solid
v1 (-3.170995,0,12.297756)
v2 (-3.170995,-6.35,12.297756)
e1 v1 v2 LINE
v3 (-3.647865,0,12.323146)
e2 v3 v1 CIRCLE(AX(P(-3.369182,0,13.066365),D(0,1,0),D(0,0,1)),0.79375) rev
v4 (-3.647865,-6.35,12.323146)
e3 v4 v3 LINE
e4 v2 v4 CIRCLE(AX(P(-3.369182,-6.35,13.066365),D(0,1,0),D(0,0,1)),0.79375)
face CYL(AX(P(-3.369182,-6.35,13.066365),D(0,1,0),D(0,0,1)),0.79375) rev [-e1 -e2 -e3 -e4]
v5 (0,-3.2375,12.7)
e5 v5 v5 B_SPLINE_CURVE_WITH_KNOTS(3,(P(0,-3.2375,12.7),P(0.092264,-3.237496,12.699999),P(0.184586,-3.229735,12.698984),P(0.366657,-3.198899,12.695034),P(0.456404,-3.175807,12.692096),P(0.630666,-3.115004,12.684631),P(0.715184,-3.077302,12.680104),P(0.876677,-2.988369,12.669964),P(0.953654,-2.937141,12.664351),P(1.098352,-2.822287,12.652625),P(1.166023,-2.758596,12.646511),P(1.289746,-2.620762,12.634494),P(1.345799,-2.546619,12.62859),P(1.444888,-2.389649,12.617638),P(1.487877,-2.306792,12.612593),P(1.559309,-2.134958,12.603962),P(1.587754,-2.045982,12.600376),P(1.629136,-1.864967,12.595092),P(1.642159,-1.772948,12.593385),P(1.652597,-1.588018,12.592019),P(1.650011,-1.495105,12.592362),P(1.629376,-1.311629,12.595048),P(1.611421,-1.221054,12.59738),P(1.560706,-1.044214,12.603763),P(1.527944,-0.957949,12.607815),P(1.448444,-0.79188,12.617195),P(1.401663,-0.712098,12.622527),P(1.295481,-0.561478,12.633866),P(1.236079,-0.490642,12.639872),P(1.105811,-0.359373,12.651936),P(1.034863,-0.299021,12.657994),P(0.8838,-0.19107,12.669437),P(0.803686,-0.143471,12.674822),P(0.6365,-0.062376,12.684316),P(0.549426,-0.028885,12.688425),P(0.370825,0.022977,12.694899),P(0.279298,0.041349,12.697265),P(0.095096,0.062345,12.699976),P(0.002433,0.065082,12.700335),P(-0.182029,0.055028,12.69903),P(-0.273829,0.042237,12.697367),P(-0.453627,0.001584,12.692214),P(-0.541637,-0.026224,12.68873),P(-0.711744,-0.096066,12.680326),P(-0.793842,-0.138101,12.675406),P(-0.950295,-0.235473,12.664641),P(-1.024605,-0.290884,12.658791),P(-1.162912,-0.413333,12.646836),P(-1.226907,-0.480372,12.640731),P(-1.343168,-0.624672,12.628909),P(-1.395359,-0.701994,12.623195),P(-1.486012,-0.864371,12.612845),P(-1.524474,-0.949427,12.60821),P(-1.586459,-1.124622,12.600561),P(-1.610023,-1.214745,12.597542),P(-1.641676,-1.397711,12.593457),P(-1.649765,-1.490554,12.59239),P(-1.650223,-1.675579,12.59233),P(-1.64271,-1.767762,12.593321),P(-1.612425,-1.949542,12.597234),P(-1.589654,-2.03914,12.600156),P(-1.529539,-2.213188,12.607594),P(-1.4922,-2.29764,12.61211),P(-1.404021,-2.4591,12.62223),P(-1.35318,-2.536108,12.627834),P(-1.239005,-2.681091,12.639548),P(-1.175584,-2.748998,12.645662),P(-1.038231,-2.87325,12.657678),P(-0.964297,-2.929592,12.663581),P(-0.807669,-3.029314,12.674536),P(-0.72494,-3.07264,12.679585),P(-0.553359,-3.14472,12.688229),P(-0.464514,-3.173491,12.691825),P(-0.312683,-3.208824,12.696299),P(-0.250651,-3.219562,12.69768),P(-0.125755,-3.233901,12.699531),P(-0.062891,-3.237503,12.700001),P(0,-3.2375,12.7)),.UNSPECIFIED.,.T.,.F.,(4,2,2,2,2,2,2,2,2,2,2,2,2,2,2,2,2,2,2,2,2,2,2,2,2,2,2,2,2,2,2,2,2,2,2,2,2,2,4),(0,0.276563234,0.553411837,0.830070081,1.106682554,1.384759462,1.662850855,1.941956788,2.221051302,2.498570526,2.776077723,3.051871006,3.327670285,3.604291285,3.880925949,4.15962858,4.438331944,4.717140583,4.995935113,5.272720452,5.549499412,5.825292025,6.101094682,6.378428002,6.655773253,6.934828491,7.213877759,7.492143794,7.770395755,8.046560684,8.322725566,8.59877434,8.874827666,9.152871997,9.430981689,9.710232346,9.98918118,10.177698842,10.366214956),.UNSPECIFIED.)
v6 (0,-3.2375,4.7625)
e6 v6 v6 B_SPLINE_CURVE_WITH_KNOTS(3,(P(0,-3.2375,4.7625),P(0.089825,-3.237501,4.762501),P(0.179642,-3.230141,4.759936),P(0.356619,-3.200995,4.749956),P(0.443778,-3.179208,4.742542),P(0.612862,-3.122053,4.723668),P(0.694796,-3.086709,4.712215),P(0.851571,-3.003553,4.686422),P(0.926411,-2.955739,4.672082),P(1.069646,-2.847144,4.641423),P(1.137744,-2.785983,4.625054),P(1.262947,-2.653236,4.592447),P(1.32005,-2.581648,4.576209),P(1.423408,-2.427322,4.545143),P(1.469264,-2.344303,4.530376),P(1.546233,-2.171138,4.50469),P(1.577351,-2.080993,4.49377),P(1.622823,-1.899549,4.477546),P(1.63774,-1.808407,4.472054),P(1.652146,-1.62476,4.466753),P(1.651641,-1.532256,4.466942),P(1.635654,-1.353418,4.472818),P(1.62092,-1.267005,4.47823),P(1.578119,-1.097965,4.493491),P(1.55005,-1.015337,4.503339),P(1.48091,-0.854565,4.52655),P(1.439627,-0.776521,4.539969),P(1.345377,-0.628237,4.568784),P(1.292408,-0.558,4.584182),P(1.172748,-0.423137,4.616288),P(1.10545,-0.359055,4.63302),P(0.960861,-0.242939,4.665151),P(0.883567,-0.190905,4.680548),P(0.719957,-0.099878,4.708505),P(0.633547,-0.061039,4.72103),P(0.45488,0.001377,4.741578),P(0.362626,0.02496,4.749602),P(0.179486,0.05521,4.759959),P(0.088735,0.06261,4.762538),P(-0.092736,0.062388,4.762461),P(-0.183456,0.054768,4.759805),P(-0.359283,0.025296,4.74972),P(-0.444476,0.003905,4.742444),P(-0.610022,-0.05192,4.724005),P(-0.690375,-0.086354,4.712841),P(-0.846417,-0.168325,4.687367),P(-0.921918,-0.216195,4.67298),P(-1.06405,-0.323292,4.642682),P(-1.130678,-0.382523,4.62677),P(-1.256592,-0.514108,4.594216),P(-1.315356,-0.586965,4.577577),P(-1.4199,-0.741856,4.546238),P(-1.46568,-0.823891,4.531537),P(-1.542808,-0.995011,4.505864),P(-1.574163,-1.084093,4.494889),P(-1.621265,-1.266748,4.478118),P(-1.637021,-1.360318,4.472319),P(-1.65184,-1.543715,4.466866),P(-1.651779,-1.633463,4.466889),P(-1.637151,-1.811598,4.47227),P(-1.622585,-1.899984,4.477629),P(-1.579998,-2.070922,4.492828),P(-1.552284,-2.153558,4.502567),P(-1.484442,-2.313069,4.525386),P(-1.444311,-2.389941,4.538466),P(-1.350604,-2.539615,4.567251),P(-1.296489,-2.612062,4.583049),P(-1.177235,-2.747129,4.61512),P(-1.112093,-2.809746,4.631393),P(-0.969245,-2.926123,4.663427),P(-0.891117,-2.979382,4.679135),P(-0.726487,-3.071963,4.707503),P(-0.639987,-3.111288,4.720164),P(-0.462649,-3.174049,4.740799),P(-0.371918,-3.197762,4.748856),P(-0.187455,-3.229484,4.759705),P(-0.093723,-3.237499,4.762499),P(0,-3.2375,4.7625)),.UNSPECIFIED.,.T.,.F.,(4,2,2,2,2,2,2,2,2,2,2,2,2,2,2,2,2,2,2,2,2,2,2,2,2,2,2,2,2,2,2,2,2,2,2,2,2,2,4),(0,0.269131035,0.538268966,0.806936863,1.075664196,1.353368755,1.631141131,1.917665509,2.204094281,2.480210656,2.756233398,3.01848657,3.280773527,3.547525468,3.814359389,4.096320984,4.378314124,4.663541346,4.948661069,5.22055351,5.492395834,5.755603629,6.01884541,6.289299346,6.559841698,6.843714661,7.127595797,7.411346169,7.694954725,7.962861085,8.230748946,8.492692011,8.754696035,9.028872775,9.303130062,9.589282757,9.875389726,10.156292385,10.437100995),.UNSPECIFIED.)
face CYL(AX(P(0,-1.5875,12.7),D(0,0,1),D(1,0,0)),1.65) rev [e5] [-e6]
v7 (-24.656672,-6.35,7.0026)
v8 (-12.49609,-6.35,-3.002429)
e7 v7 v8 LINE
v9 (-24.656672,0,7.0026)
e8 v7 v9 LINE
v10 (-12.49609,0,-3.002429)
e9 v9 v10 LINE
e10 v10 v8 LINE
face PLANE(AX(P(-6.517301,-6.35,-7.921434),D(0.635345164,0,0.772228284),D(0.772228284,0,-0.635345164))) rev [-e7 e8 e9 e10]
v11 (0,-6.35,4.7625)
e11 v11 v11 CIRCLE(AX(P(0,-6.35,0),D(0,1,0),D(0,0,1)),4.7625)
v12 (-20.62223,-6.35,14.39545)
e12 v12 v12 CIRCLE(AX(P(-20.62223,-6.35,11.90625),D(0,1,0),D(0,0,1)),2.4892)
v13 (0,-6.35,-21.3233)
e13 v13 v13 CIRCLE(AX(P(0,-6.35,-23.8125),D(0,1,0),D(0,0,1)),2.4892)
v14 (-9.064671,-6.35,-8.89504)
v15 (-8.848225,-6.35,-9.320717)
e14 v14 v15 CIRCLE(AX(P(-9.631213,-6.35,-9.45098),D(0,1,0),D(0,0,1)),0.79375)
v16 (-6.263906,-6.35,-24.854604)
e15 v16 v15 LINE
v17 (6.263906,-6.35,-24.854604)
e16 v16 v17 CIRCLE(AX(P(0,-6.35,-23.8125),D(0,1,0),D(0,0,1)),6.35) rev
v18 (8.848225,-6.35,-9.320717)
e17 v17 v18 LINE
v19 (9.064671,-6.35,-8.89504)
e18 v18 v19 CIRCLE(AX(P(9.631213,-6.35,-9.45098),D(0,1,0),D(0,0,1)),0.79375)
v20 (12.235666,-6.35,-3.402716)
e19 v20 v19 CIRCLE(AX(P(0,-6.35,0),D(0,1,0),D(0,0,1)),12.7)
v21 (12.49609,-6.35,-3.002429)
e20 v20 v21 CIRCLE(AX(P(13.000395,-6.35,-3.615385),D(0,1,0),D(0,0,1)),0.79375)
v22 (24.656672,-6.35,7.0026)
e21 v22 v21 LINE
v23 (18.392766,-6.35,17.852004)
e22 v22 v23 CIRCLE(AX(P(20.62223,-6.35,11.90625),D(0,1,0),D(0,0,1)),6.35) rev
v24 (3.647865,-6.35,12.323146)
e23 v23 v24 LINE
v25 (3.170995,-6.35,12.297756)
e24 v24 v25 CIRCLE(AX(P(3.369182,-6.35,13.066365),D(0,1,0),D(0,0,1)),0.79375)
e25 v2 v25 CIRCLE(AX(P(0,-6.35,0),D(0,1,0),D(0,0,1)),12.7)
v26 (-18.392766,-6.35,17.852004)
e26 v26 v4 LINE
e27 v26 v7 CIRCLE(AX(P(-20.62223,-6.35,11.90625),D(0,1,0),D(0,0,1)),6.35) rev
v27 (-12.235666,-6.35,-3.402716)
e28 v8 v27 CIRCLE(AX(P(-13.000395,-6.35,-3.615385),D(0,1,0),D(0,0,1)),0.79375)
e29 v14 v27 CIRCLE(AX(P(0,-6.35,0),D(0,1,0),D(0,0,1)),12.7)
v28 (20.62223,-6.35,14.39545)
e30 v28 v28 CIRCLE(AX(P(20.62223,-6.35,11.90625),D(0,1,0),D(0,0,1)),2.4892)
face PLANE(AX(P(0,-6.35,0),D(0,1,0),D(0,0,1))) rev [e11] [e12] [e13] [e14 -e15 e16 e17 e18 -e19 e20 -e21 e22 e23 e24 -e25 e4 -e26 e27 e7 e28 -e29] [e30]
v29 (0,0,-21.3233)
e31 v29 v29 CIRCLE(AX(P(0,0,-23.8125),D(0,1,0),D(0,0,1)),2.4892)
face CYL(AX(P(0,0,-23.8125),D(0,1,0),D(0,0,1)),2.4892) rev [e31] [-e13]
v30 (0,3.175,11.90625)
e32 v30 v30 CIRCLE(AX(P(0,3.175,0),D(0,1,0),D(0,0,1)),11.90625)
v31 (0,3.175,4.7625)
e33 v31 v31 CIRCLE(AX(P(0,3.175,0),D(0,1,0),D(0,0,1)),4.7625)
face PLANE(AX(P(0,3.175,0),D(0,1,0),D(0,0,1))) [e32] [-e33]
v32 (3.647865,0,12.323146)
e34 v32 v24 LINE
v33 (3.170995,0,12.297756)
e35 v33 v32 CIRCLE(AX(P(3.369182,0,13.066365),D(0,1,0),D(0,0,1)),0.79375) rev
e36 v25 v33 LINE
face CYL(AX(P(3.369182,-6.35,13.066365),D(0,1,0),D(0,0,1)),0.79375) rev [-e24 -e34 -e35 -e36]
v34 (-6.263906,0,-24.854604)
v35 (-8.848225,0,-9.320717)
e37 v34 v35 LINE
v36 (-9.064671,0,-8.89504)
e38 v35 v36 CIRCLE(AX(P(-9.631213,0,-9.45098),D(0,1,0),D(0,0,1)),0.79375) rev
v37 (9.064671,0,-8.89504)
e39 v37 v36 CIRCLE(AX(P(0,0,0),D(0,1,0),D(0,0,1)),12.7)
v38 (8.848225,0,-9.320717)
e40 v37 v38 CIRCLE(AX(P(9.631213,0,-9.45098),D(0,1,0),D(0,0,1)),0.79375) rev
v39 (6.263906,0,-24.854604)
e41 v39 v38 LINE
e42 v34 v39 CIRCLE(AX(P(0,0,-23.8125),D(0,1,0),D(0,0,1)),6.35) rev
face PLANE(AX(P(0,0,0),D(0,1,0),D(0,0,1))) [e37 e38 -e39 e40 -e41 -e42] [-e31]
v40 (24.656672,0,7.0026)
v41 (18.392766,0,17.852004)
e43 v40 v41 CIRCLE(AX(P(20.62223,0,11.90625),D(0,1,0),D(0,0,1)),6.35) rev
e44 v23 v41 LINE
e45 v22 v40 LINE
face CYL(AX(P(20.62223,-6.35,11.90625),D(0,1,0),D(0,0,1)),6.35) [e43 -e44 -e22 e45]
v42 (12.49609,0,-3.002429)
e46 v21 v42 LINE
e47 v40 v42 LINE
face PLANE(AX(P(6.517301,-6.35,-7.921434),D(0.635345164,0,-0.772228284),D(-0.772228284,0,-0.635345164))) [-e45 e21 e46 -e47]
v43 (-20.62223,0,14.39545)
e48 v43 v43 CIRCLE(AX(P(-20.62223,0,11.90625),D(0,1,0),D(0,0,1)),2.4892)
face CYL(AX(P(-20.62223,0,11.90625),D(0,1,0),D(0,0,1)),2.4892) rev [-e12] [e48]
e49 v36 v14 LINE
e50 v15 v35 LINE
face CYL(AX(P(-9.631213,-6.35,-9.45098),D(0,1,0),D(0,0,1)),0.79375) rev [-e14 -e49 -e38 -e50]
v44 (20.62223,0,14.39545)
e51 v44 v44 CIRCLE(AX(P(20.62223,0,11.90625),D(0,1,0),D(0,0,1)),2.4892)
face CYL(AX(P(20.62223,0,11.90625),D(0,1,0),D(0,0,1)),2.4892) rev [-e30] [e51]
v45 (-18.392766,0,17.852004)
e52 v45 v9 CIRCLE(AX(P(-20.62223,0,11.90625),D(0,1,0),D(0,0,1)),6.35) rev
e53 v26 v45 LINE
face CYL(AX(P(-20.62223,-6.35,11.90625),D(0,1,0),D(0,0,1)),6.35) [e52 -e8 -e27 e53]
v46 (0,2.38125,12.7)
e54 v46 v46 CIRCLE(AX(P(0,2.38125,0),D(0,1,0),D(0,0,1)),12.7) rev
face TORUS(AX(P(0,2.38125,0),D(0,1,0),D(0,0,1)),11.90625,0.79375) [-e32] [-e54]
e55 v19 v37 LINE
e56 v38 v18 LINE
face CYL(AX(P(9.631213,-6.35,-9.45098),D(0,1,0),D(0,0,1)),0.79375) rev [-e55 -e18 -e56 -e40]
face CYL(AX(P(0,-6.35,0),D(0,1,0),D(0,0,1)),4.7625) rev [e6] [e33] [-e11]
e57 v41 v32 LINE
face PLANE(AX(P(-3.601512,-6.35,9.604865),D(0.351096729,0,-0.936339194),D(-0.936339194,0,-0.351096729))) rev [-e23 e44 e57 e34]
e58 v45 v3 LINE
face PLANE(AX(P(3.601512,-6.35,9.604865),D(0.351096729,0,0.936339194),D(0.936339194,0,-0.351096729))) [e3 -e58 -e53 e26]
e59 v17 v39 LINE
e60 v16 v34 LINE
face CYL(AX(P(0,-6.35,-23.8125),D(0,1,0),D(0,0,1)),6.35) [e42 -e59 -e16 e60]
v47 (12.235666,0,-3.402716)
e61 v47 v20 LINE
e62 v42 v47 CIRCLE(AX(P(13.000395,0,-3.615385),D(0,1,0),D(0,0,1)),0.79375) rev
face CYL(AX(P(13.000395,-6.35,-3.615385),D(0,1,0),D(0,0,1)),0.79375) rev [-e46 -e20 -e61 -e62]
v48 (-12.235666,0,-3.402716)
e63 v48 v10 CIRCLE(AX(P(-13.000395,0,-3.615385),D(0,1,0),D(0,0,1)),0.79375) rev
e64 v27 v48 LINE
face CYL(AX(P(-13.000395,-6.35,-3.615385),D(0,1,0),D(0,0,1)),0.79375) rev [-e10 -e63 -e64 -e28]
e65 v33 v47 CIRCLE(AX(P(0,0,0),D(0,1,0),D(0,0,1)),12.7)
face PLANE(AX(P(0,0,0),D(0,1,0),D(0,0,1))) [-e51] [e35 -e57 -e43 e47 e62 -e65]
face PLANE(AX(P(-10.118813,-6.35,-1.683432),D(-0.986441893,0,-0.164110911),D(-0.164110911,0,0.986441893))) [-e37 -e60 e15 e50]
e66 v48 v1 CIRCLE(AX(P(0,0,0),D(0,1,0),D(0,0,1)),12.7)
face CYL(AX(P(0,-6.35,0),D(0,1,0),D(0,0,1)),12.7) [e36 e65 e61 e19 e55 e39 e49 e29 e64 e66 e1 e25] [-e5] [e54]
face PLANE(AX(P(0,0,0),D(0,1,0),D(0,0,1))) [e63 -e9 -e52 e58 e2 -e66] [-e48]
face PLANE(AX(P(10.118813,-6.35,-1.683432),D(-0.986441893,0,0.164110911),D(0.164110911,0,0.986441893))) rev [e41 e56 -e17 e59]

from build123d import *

# Parameters (mm, degrees)
SKETCH1_R                        = 12.7
SKETCH1_R_2                      = 4.7625
BOSS_EXTRUDE1_DEPTH              = 6.35
BOSS_EXTRUDE2_START              = 3.175
SKETCH1_5_R                      = 12.7
SKETCH1_5_R_2                    = 4.7625
BOSS_EXTRUDE2_DEPTH              = 3.175
F_10_CLEARANCE_HOLE1_D           = 4.9784
TAP_DRILL_FOR_M4X0_7_TAP1_REACH  = 52.866
TAP_DRILL_FOR_M4X0_7_TAP1_BORE_R = 1.65
FILLET1_R                        = 0.79375


with BuildPart() as part:
    # Sketch1 → Boss-Extrude1 (new body)
    # profile 1 of 4: a face of its own
    with BuildSketch(Plane(origin=(0, 0, 0), x_dir=(1, 0, 0), z_dir=(0, 1, 0))):
        with BuildLine():
            ThreePointArc((6.263906023, 24.854604283), (0, 30.1625), (-6.263906023, 24.854604283))
            Line((-6.263906023, 24.854604283), (-8.89, 9.069614104))
            ThreePointArc((-8.89, 9.069614104), (0, 12.7), (8.89, 9.069614104))
            Line((8.89, 9.069614104), (6.263906023, 24.854604283))
        make_face()
    # profile 2 of 4: a face of its own
    with BuildSketch(Plane(origin=(0, 0, 0), x_dir=(1, 0, 0), z_dir=(0, 1, 0))):
        Circle(SKETCH1_R)
        with Locations(Location((0, 0, 0), (0, 0, 270))):
            Circle(SKETCH1_R_2, mode=Mode.SUBTRACT)
    # profile 3 of 4: a face of its own
    with BuildSketch(Plane(origin=(0, 0, 0), x_dir=(1, 0, 0), z_dir=(0, 1, 0))):
        with BuildLine():
            Line((24.656671722, -7.002600399), (12.299516217, 3.164158788))
            ThreePointArc((12.299516217, 3.164158788), (12.599481258, 1.594701233), (12.7, 0))
            ThreePointArc((12.7, 0), (10.114120228, -7.680792409), (3.409516217, -12.233772892))
            Line((3.409516217, -12.233772892), (18.392765699, -17.852003884))
            ThreePointArc((18.392765699, -17.852003884), (26.121491242, -15.08125), (24.656671722, -7.002600399))
        make_face()
    # profile 4 of 4: a face of its own
    with BuildSketch(Plane(origin=(0, 0, 0), x_dir=(1, 0, 0), z_dir=(0, 1, 0))):
        with BuildLine():
            ThreePointArc((-3.409516217, -12.233772892), (-10.998522628, -6.35), (-12.299516217, 3.164158788))
            Line((-12.299516217, 3.164158788), (-24.656671722, -7.002600399))
            ThreePointArc((-24.656671722, -7.002600399), (-26.121491242, -15.08125), (-18.392765699, -17.852003884))
            Line((-18.392765699, -17.852003884), (-3.409516217, -12.233772892))
        make_face()
    extrude(amount=-BOSS_EXTRUDE1_DEPTH)

    # Sketch1<5> → Boss-Extrude2 (add)
    with BuildSketch(Plane(origin=(0, 0, 0), x_dir=(1, 0, 0), z_dir=(0, 1, 0)).offset(BOSS_EXTRUDE2_START)):
        with Locations(Location((0, 0, 0), (0, 0, 270))):
            Circle(SKETCH1_5_R)
        with Locations(Location((0, 0, 0), (0, 0, 270))):
            Circle(SKETCH1_5_R_2, mode=Mode.SUBTRACT)
    extrude(amount=-BOSS_EXTRUDE2_DEPTH)

    # #10 Clearance Hole1 (through all)
    with Locations(Plane(origin=(0, 0, -23.8125), x_dir=(0, 0, 1), z_dir=(0, 1, 0))):
        with Locations((0, 0), (35.71875, 20.622229928), (35.71875, -20.622229928)):
            Hole(F_10_CLEARANCE_HOLE1_D / 2)

    # Tap Drill for M4x0.7 Tap1 bore (on position points) → Tap Drill for M4x0.7 Tap1 (cut, up to next)
    with BuildSketch(Plane(origin=(0, -1.5875, 12.7), x_dir=(1, 0, 0), z_dir=(0, 0, 1)), mode=Mode.PRIVATE) as tap_drill_for_m4x0_7_tap1_sk1:
        Circle(TAP_DRILL_FOR_M4X0_7_TAP1_BORE_R)
    tap_drill_for_m4x0_7_tap1_tool1 = extrude(tap_drill_for_m4x0_7_tap1_sk1.sketch, amount=-TAP_DRILL_FOR_M4X0_7_TAP1_REACH, mode=Mode.PRIVATE) & part.part
    add(tap_drill_for_m4x0_7_tap1_tool1.solids().sort_by_distance((0, -1.5875, 12.7))[0], mode=Mode.SUBTRACT)

    # Fillet1
    # the kernel refuses this fillet: 0.79375 mm, written as the material it adds along each edge
    with BuildSketch(Plane(origin=(8.89, 0, -9.069614104), x_dir=(0.7073032764952122, 0, 0.7069102312593428), z_dir=(0, -1, 0)), Plane(origin=(3.409516217, 0, 12.233772892), x_dir=(-0.9658538567133282, 0, 0.2590874899951552), z_dir=(0, -1, 0)), Plane(origin=(-12.299516217, 0, -3.164158788), x_dir=(0.2585505802181169, 0, -0.965997721254494), z_dir=(0, -1, 0))) as fillet1_piece_1:
        with BuildLine():
            CenterArc((0.254671056, -0.793712483), FILLET1_R, 90.557072072, 35.013262483)
            Line((-0.207054828, -0.148074604), (0, 0))
            ThreePointArc((0, 0), (0.123476876, -0.000600272), (0.246953752, 0))
        make_face()
    extrude(amount=6.35)
    with BuildSketch(Plane(origin=(12.299516217, 0, -3.164158788), x_dir=(-0.2585505802181021, 0, -0.9659977212544979), z_dir=(0, -1, 0)), Plane(origin=(-3.409516217, 0, 12.233772892), x_dir=(0.9658538567133268, 0, 0.2590874899951606), z_dir=(0, -1, 0)), Plane(origin=(-8.89, 0, -9.069614104), x_dir=(-0.7073032764952193, 0, 0.7069102312593356), z_dir=(0, -1, 0))) as fillet1_piece_2:
        with BuildLine():
            CenterArc((0.254671056, 0.793712483), FILLET1_R, 234.429665445, 35.013262483)
            Line((-0.207054828, 0.148074604), (0, 0))
            ThreePointArc((0, 0), (0.123476876, 0.000600272), (0.246953752, 0))
        make_face()
    extrude(amount=6.35)
    # the kernel refuses this fillet: 0.79375 mm, written as the material it takes off along each edge
    with BuildSketch(Plane(origin=(0, 3.175, 0), x_dir=(0, 0, 1), z_dir=(-1, 0, 0))) as fillet1_2_piece_1:
        with BuildLine():
            CenterArc((12.7 - FILLET1_R, -FILLET1_R), FILLET1_R, 0, 90)
            Line((12.7, -FILLET1_R), (12.7, 0))
            Line((12.7, 0), (12.7 - FILLET1_R, 0))
        make_face()
    revolve(axis=Axis((0, 3.175, 0), (0, 1, 0)), mode=Mode.SUBTRACT)


solid = part.part
